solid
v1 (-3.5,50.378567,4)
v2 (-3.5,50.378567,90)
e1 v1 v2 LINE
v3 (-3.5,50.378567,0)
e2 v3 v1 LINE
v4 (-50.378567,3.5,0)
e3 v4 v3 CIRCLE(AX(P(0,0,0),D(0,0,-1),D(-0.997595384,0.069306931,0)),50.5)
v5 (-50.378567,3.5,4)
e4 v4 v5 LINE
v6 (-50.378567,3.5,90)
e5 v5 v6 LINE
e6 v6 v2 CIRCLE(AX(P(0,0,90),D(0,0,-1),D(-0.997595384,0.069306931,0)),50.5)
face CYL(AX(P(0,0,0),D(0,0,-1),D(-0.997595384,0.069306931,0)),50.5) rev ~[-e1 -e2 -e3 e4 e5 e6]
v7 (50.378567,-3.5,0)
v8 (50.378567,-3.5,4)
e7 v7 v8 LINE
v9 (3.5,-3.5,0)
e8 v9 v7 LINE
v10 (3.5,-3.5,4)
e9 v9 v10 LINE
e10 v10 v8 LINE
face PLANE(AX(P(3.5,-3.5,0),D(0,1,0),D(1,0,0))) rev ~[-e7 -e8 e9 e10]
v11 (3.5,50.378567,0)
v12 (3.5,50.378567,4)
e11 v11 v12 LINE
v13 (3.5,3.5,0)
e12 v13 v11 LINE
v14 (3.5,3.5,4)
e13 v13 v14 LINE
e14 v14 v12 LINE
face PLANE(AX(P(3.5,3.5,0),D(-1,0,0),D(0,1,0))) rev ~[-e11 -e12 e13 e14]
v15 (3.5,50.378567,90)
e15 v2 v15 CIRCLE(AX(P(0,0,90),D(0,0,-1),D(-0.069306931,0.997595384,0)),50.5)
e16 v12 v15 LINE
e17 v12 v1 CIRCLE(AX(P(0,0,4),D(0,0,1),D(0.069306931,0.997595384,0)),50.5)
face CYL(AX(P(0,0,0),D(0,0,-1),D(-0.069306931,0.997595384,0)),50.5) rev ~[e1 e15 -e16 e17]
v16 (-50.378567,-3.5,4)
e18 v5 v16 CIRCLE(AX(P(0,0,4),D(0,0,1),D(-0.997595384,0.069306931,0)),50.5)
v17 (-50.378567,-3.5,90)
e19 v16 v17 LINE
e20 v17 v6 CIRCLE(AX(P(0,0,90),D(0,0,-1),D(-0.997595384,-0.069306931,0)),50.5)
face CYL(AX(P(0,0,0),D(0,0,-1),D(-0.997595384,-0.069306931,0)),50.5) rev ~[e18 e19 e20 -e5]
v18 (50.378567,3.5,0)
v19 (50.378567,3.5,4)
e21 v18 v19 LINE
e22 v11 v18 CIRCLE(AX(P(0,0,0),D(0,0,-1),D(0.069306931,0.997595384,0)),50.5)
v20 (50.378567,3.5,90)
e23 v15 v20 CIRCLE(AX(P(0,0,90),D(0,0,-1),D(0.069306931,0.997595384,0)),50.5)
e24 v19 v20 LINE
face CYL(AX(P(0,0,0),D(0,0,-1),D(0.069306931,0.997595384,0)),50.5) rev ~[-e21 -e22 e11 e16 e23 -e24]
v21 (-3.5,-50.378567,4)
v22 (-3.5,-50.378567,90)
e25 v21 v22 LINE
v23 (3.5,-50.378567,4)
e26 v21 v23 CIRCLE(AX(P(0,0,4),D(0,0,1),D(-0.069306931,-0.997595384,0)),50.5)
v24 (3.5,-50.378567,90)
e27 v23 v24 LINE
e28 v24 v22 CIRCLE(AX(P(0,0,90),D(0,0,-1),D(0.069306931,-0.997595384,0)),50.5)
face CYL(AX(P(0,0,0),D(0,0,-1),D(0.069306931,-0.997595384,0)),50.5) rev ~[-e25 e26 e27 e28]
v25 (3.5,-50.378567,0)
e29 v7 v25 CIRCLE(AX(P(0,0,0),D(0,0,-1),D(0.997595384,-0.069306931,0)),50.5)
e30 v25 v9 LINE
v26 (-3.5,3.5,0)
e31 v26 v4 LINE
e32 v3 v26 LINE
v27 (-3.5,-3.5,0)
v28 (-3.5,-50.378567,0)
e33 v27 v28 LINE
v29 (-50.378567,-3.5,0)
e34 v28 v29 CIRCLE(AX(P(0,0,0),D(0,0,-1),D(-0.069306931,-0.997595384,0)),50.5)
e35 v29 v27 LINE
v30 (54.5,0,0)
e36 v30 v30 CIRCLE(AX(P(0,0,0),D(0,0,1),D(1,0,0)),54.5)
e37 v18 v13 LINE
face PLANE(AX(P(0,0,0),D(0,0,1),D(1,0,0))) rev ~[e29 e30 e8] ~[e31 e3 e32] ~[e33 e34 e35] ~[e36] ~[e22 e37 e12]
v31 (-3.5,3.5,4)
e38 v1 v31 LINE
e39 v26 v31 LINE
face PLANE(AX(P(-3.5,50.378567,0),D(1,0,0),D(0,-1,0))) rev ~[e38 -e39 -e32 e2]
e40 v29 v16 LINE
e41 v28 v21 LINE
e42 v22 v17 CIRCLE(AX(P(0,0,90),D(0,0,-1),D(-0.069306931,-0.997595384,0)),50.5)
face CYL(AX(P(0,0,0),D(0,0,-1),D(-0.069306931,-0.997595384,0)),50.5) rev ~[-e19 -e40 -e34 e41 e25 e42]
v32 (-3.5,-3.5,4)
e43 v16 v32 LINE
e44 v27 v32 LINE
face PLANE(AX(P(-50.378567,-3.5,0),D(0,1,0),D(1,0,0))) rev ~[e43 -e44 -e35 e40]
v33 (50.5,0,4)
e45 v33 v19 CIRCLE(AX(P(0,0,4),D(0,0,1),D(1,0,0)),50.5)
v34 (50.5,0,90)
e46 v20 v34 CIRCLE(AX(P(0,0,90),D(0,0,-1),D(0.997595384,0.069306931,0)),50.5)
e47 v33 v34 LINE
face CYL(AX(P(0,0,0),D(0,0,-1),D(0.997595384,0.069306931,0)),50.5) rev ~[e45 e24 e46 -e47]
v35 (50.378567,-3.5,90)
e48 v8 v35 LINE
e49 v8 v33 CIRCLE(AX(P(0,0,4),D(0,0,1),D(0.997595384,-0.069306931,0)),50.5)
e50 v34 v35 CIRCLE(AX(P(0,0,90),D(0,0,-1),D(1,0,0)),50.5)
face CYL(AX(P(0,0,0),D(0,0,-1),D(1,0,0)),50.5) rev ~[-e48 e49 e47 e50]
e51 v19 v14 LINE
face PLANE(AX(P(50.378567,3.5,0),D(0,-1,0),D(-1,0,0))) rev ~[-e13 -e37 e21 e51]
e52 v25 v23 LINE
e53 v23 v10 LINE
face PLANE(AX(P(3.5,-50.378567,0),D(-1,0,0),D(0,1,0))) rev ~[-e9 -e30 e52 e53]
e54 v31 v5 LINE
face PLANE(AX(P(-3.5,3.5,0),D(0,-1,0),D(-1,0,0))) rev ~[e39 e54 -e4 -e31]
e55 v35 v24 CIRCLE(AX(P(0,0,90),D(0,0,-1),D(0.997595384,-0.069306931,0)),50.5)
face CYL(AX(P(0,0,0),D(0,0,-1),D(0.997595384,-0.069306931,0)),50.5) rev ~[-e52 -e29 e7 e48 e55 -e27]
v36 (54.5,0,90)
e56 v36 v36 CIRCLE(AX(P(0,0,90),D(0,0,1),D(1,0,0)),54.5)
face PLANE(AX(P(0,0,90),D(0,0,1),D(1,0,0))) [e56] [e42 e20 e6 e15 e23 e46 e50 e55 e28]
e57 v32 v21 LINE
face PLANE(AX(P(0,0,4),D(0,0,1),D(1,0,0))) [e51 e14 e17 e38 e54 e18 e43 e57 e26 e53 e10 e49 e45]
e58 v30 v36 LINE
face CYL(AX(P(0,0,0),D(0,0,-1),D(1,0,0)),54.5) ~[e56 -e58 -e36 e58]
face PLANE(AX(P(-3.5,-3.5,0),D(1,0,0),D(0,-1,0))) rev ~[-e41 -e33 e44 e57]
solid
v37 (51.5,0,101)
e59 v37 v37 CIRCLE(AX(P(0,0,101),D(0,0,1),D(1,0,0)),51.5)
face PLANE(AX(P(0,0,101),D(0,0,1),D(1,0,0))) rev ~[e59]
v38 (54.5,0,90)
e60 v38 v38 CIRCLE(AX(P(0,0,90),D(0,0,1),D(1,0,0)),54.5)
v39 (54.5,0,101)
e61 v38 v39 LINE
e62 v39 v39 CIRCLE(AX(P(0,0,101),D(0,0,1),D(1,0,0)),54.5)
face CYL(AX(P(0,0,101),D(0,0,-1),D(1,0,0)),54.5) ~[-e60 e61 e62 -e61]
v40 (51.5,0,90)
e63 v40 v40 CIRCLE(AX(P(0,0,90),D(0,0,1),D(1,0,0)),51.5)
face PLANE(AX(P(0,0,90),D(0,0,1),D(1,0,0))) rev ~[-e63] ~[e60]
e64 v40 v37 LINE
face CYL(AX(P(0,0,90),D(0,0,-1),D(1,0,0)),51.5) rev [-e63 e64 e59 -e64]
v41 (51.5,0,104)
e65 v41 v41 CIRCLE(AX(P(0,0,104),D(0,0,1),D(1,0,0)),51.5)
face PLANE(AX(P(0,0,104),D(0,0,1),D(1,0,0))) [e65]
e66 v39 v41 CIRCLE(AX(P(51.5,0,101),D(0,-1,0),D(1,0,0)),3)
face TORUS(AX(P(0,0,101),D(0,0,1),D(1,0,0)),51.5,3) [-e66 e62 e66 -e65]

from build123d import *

# Parameters (mm, degrees)
F0_R     = 54.5
F1_DEPTH = 90
F0_W     = 7
F0_H     = 7
F2_DEPTH = 4
F3_R     = 54.5
F3_R_2   = 51.5
F4_DEPTH = 11
F5_R     = 54.5
F5_R_2   = 51.5
F5_R_3   = 48.5912547039
F6_DEPTH = 3
F7_R     = 3


# Not quite as in the source:
# - a feature of the source that left no trace in its solid (it failed there, or was rolled back) is left out


with BuildPart() as f1:
    # F0 (on Top) → F1 (new body)
    with BuildSketch(Plane.XY):
        Circle(F0_R)
        with BuildLine():
            ThreePointArc((50.3785668712, 3.5), (50.4696325873, 1.7510529693), (50.5, 0))
            ThreePointArc((50.5, 0), (50.4696325873, -1.7510529693), (50.3785668712, -3.5))
            ThreePointArc((50.3785668712, -3.5), (35.7088924499, -35.7088924499), (3.5, -50.3785668712))
            ThreePointArc((3.5, -50.3785668712), (0, -50.5), (-3.5, -50.3785668712))
            ThreePointArc((-3.5, -50.3785668712), (-35.7088924499, -35.7088924499), (-50.3785668712, -3.5))
            ThreePointArc((-50.3785668712, -3.5), (-50.5, 0), (-50.3785668712, 3.5))
            ThreePointArc((-50.3785668712, 3.5), (-35.7088924499, 35.7088924499), (-3.5, 50.3785668712))
            ThreePointArc((-3.5, 50.3785668712), (0, 50.5), (3.5, 50.3785668712))
            ThreePointArc((3.5, 50.3785668712), (35.7088924499, 35.7088924499), (50.3785668712, 3.5))
        make_face(mode=Mode.SUBTRACT)
    extrude(amount=F1_DEPTH)

    # F0 (on Top) → F2 (join)
    with BuildSketch(Plane.XY):
        Rectangle(F0_W, F0_H)
        with BuildLine():
            ThreePointArc((-3.5, -50.3785668712), (0, -50.5), (3.5, -50.3785668712))
            Line((3.5, -50.3785668712), (3.5, -3.5))
            Line((3.5, -3.5), (-3.5, -3.5))
            Line((-3.5, -3.5), (-3.5, -50.3785668712))
        make_face()
        with BuildLine():
            ThreePointArc((50.3785668712, -3.5), (50.4696325873, -1.7510529693), (50.5, 0))
            ThreePointArc((50.5, 0), (50.4696325873, 1.7510529693), (50.3785668712, 3.5))
            Line((50.3785668712, 3.5), (3.5, 3.5))
            Line((3.5, 3.5), (3.5, -3.5))
            Line((3.5, -3.5), (50.3785668712, -3.5))
        make_face()
        with BuildLine():
            Line((3.5, 3.5), (3.5, 50.3785668712))
            ThreePointArc((3.5, 50.3785668712), (0, 50.5), (-3.5, 50.3785668712))
            Line((-3.5, 50.3785668712), (-3.5, 3.5))
            Line((-3.5, 3.5), (3.5, 3.5))
        make_face()
        with BuildLine():
            Line((-3.5, -3.5), (-3.5, 3.5))
            Line((-3.5, 3.5), (-50.3785668712, 3.5))
            ThreePointArc((-50.3785668712, 3.5), (-50.5, 0), (-50.3785668712, -3.5))
            Line((-50.3785668712, -3.5), (-3.5, -3.5))
        make_face()
    extrude(amount=F2_DEPTH)


with BuildPart() as f4:
    # F3 (on face) → F4 (new body)
    with BuildSketch(Plane.XY.offset(90)):
        Circle(F3_R)
        Circle(F3_R_2, mode=Mode.SUBTRACT)
    extrude(amount=F4_DEPTH)

    # F5 (on face) → F6 (join)
    with BuildSketch(Plane.XY.offset(101)):
        Circle(F5_R)
        Circle(F5_R_2, mode=Mode.SUBTRACT)
        Circle(F5_R_2)
        Circle(F5_R_3, mode=Mode.SUBTRACT)
        Circle(F5_R_3)
    extrude(amount=F6_DEPTH)

    # F7
    f7_edges = [f4.edges().sort_by_distance(p)[0] for p in [
        (-54.5, 0, 104),
    ]]
    fillet(f7_edges, radius=F7_R)


solid = Compound([f1.part, f4.part])
